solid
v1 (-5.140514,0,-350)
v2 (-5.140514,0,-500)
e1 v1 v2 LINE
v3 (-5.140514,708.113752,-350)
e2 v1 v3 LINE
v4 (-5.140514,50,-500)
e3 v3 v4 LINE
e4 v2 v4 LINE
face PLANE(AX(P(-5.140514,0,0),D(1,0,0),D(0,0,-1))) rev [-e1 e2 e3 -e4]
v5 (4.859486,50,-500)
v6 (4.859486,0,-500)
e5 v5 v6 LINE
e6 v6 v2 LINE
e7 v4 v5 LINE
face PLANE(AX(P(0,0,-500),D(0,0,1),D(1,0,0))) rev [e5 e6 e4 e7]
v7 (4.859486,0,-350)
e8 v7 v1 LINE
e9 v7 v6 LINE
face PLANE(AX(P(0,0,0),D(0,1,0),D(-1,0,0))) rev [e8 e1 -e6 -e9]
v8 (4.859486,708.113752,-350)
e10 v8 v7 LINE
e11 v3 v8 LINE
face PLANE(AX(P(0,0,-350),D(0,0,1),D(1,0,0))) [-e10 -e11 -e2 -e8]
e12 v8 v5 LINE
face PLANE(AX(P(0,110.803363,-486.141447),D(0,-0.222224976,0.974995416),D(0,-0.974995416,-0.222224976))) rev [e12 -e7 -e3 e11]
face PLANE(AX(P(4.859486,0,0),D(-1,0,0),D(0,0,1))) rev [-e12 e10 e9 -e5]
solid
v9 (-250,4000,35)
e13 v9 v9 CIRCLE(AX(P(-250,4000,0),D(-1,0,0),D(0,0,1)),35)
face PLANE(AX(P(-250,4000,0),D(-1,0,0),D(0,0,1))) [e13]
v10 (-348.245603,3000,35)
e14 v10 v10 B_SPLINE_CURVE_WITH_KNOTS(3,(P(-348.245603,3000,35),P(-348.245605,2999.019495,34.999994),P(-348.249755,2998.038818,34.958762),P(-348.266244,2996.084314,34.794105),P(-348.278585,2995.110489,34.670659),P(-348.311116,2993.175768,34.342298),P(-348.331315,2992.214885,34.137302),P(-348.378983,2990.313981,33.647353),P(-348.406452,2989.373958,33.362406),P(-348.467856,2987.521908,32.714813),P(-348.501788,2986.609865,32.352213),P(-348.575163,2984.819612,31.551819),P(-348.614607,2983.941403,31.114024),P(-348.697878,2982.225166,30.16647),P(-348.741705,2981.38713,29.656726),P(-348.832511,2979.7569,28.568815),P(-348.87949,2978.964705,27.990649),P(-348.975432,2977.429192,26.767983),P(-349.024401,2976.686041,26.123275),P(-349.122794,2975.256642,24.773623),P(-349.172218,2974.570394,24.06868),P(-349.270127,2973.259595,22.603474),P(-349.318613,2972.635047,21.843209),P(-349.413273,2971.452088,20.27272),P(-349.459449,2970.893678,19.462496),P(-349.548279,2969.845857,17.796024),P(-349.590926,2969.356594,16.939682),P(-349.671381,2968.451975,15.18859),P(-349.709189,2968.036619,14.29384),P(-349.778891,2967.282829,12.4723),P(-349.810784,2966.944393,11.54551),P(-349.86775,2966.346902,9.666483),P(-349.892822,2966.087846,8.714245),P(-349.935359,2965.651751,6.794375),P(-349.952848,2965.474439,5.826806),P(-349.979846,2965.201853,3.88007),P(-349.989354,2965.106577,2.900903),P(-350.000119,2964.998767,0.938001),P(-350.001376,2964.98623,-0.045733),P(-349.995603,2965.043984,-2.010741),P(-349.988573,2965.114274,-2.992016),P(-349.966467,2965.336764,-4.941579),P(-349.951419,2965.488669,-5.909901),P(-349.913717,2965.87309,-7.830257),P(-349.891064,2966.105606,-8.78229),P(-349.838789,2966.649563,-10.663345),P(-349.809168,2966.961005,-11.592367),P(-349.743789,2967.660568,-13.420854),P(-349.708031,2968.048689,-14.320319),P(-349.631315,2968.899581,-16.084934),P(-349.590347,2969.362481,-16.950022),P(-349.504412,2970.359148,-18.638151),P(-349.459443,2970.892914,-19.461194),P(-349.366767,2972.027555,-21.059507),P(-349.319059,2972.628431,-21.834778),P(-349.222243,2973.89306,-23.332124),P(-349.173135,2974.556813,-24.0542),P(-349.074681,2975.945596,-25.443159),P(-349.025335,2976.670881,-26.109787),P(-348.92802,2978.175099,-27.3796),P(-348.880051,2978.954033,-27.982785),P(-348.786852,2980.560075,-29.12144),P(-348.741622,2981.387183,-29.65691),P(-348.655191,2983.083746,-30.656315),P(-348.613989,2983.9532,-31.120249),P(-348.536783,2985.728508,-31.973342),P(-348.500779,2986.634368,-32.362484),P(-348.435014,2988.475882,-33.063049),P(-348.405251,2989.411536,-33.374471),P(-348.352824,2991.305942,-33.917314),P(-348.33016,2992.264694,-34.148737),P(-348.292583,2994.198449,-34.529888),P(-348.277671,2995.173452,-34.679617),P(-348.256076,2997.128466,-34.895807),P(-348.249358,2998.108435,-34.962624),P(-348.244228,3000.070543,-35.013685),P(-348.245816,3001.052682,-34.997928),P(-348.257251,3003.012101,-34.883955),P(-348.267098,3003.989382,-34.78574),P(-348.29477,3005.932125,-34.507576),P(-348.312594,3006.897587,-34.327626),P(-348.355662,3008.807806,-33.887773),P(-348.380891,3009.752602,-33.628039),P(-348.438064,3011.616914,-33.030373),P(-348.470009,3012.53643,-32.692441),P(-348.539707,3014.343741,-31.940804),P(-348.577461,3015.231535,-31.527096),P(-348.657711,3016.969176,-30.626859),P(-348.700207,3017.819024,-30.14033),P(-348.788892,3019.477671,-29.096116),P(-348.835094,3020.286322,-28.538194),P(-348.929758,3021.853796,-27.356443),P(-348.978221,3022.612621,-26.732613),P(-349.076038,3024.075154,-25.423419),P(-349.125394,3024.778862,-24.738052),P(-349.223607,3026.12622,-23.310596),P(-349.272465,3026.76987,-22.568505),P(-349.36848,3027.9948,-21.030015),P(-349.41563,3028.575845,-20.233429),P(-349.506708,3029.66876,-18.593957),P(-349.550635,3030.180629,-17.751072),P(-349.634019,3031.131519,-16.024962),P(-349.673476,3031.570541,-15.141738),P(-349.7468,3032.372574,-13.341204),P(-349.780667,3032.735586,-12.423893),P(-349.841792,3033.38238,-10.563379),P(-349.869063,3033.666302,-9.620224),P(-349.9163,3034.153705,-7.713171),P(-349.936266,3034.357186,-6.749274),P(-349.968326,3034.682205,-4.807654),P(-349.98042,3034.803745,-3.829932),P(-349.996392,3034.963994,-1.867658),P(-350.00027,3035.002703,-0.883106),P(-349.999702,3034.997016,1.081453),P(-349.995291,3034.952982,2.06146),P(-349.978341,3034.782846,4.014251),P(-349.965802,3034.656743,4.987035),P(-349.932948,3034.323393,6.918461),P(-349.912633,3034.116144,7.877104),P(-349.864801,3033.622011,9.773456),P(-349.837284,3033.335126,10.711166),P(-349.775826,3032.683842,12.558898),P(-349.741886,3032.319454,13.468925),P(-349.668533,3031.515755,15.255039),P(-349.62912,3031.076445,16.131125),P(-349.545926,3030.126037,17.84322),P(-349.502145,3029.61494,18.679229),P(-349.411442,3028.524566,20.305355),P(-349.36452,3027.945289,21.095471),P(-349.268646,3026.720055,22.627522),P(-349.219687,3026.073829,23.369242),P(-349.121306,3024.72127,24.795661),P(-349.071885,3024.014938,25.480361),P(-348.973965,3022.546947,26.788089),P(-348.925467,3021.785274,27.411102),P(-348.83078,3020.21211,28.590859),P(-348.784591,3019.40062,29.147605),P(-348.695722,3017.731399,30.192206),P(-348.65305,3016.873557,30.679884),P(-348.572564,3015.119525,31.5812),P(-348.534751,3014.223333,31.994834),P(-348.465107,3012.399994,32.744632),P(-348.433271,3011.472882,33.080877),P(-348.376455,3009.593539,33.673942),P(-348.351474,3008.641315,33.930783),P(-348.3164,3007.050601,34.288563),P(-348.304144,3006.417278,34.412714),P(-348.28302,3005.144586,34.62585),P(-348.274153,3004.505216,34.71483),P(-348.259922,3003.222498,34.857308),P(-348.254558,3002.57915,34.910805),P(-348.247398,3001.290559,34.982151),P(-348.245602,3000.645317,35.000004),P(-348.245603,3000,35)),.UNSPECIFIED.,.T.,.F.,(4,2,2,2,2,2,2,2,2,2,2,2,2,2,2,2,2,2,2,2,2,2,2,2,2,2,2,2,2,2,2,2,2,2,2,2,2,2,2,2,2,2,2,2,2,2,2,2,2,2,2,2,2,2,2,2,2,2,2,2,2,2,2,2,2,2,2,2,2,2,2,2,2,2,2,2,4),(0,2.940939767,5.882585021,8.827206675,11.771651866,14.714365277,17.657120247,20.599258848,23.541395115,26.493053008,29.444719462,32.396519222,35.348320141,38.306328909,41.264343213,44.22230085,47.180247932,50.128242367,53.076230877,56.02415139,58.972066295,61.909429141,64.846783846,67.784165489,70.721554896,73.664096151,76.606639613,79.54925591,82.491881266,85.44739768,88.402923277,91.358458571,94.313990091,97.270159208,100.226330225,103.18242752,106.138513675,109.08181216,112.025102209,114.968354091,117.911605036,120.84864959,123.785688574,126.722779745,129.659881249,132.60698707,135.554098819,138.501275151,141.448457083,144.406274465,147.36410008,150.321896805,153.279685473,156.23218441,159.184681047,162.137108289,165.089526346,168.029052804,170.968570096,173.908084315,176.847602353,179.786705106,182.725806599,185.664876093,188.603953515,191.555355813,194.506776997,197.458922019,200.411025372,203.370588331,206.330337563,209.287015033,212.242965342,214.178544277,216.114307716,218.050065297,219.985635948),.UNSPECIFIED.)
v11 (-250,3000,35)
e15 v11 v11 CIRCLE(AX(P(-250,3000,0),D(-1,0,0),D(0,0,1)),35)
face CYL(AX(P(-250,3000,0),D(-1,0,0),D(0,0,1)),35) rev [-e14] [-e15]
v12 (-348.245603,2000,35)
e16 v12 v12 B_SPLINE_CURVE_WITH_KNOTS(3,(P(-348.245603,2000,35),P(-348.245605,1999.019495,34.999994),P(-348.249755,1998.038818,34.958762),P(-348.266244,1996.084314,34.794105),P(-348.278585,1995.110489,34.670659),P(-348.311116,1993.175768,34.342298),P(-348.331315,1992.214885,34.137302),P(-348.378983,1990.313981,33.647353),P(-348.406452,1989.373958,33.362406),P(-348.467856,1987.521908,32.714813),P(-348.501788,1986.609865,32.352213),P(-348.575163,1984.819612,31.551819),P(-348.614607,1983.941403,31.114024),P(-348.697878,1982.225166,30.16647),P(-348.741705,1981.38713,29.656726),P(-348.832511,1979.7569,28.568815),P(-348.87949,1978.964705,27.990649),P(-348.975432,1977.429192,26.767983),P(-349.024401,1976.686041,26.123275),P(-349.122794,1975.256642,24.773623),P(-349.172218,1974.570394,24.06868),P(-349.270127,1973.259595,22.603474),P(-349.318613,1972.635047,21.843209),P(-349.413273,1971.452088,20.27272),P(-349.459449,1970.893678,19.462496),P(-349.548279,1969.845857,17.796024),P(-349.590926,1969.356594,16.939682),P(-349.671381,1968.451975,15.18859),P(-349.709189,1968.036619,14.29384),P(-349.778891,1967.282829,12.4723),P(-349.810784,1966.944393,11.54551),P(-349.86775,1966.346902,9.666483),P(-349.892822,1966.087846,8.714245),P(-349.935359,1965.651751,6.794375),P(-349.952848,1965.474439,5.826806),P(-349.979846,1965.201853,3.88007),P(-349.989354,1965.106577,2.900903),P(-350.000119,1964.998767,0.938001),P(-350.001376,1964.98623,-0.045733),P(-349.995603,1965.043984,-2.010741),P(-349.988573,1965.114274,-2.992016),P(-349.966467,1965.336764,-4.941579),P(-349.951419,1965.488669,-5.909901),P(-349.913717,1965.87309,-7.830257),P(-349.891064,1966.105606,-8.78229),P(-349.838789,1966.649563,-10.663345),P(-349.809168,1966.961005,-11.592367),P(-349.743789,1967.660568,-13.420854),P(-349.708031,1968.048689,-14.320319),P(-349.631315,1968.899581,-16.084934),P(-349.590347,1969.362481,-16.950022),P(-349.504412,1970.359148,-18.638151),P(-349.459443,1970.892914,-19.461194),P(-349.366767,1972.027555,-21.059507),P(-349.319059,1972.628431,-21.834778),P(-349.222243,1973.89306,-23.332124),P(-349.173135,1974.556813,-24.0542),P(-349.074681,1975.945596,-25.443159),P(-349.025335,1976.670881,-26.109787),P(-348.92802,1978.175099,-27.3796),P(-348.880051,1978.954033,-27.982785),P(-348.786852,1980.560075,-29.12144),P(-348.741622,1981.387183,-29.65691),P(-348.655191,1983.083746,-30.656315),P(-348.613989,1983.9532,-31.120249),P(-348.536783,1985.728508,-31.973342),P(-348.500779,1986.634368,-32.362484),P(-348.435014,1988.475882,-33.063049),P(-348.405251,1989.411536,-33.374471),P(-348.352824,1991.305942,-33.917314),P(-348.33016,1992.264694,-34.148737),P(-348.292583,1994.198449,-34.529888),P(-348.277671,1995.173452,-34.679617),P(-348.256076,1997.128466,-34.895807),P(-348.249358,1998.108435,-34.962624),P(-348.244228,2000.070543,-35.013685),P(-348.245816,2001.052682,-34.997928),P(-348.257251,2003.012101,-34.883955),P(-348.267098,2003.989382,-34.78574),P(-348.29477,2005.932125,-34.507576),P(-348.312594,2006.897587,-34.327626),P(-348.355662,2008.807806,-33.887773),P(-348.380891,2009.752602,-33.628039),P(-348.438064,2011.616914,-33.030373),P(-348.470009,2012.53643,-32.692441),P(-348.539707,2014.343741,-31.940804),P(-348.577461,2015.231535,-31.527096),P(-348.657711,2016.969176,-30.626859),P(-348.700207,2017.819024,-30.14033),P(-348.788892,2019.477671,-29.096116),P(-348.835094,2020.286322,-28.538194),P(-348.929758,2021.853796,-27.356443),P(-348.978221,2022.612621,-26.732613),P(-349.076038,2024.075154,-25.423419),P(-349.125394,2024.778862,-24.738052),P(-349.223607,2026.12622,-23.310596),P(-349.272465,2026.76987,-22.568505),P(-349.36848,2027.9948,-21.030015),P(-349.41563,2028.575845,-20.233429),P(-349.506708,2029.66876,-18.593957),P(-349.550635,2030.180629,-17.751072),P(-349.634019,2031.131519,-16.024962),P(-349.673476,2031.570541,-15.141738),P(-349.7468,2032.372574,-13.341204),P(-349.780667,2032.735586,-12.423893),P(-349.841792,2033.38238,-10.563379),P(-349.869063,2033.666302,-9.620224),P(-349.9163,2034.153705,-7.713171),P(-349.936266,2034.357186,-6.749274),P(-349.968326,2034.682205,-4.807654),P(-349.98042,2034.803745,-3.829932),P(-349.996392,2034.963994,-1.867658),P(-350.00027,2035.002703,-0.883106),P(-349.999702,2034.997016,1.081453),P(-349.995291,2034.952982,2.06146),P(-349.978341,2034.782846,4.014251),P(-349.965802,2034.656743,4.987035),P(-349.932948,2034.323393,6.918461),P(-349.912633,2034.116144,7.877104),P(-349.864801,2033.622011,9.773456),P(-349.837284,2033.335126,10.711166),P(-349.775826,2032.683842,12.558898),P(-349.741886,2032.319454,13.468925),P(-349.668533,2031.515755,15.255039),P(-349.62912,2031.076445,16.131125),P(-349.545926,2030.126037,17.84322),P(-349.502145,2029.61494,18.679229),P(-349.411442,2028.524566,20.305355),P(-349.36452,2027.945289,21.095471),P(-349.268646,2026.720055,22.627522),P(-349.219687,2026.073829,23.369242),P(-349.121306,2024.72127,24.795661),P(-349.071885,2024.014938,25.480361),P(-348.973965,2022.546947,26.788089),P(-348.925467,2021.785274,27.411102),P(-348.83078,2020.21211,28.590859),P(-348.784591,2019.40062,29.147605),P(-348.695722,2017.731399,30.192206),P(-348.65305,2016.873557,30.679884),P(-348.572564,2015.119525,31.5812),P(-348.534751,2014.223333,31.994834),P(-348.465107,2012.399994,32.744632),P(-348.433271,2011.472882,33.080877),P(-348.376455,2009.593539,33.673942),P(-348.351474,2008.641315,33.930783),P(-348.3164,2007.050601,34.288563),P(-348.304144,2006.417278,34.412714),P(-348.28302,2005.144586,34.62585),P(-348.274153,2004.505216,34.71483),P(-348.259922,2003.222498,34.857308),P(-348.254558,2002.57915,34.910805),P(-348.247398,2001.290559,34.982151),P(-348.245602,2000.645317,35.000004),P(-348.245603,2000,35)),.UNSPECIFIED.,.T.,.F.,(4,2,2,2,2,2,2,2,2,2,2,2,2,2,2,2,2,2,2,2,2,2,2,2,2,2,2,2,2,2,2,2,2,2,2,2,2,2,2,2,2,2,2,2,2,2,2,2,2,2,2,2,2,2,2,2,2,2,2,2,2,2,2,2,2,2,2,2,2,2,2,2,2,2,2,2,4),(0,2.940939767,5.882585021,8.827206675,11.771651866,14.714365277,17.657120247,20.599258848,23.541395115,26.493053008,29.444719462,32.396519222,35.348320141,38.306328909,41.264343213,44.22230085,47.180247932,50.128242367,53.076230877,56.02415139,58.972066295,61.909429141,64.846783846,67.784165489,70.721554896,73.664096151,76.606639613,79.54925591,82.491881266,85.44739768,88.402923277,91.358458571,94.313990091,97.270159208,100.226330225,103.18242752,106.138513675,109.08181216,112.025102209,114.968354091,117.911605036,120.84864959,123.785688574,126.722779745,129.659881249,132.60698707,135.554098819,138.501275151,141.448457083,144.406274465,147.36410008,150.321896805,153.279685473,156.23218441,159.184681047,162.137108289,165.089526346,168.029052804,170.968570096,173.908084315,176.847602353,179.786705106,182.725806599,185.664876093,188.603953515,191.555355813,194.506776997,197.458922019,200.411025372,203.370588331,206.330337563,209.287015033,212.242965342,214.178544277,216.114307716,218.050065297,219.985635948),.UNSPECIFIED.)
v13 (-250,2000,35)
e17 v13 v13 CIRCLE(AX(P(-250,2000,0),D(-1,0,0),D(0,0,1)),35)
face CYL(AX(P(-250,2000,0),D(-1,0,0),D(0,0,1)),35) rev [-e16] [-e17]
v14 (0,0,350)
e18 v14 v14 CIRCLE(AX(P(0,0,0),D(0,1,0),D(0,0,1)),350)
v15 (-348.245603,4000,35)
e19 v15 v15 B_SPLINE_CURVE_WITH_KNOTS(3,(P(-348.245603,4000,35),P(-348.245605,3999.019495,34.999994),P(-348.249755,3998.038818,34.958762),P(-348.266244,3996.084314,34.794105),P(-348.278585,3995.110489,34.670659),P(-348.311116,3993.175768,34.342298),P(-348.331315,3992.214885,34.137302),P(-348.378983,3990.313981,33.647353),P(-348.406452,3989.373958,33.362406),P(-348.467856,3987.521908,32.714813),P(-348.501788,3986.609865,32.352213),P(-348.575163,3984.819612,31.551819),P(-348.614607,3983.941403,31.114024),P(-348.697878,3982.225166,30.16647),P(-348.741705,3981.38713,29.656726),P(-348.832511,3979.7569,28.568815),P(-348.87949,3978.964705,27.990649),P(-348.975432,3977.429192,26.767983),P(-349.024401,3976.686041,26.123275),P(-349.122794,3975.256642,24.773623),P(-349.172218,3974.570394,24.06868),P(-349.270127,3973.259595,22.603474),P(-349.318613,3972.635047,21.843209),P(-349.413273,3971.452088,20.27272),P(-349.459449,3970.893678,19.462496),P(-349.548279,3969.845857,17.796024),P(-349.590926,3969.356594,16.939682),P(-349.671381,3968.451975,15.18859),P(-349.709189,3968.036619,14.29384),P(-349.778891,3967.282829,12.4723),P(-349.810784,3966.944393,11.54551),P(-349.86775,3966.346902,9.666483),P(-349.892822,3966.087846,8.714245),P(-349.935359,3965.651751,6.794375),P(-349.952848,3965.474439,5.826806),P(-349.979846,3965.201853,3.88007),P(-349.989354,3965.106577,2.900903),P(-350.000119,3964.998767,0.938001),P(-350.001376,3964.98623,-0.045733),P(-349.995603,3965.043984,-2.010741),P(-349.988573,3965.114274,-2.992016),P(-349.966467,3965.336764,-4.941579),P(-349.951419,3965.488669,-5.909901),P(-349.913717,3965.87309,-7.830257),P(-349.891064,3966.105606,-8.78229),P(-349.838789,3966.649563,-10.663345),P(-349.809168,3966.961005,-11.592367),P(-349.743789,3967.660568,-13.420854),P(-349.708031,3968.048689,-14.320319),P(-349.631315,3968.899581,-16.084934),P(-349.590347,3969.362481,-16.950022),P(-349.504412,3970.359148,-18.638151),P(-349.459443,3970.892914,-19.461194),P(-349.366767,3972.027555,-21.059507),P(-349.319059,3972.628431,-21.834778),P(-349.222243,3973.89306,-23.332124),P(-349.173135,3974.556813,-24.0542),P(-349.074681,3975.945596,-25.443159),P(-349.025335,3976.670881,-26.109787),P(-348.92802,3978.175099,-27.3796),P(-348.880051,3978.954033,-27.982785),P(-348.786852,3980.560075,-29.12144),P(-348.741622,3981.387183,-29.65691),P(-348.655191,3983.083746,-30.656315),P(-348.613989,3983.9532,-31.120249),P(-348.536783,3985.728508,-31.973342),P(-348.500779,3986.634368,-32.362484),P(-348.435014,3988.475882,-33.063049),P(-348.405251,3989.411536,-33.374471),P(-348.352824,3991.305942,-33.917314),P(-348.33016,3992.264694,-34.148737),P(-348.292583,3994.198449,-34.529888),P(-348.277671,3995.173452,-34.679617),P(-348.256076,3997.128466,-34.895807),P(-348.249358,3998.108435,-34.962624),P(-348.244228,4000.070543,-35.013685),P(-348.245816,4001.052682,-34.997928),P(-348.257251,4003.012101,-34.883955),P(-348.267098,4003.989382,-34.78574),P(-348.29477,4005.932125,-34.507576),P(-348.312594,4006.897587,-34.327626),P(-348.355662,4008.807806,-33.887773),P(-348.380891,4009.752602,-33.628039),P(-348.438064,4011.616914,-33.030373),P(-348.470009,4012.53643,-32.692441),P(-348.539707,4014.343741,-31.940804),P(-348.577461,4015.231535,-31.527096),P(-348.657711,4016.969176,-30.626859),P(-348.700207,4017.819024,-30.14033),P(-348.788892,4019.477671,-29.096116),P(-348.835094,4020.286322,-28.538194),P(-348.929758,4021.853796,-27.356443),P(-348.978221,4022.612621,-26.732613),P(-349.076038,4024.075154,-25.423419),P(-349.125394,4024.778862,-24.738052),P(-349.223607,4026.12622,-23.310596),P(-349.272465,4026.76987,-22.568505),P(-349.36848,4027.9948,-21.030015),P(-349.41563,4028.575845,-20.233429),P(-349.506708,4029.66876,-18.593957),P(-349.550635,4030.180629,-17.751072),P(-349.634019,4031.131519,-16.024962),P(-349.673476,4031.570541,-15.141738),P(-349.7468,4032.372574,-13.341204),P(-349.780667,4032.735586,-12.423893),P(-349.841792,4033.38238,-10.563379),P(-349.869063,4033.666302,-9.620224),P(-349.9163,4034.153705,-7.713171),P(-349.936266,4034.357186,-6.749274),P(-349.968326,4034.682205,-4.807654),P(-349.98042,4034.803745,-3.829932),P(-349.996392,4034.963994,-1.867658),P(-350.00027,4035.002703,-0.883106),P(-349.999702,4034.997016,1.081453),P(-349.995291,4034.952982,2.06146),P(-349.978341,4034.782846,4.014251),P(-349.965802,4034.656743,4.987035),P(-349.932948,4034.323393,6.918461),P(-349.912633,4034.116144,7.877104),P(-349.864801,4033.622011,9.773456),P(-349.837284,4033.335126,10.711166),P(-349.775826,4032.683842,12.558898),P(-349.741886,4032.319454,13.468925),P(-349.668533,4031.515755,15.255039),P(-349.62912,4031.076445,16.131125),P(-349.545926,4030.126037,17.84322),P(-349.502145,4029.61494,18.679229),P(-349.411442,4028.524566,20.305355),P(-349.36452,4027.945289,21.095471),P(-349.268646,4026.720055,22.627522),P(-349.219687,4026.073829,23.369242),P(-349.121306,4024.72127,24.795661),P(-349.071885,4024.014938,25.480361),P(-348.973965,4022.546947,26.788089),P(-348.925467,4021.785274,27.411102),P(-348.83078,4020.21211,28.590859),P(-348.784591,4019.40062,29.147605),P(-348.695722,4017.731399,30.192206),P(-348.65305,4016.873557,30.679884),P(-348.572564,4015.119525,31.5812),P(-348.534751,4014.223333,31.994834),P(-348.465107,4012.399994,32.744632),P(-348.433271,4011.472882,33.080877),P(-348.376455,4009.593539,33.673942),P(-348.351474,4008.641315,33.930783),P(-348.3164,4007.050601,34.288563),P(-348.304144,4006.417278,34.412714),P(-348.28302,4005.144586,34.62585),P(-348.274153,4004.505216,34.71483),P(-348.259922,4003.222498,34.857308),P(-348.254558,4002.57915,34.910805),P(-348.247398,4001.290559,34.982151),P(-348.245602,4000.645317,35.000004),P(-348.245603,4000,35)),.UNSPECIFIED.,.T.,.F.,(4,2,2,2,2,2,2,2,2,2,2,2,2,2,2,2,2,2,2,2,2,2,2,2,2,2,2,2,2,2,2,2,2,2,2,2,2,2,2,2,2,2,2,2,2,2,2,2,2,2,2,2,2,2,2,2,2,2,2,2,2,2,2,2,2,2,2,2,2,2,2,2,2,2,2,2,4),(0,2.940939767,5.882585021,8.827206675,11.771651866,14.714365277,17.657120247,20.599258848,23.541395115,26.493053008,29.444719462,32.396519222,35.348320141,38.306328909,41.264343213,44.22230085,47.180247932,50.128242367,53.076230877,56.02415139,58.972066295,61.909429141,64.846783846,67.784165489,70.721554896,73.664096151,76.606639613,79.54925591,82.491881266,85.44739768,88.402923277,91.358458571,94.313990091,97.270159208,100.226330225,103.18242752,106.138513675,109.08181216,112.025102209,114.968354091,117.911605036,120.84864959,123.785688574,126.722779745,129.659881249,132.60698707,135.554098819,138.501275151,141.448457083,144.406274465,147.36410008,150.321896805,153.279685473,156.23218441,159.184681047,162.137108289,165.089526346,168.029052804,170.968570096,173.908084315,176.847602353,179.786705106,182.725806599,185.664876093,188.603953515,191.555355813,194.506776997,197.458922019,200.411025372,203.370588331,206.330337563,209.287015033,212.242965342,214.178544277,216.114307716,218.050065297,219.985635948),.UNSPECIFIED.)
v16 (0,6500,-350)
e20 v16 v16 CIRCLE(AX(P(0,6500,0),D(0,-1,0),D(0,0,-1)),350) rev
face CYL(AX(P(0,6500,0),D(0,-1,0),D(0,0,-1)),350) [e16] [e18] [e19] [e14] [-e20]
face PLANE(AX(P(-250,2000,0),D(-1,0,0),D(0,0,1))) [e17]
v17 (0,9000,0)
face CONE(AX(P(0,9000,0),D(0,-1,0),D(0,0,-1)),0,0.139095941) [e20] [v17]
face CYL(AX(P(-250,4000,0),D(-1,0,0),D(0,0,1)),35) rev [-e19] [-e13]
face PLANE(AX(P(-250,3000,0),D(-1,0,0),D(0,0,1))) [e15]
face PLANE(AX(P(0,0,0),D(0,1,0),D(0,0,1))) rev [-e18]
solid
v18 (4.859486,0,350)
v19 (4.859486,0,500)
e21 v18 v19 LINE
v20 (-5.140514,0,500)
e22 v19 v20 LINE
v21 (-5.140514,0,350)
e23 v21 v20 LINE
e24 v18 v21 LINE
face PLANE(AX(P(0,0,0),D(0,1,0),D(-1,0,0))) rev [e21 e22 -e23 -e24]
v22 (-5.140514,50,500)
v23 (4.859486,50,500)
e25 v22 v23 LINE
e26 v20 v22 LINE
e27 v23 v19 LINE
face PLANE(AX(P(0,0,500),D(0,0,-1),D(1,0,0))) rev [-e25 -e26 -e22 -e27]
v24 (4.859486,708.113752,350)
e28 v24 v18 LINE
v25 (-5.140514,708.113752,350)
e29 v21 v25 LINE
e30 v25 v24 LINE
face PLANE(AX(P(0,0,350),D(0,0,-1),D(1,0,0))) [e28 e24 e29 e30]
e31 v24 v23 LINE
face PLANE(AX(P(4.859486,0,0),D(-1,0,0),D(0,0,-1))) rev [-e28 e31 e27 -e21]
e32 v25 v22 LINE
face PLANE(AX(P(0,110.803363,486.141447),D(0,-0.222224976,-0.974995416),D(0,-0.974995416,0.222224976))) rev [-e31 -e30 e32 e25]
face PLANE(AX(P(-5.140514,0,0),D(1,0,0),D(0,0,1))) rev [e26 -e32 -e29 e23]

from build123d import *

# Parameters (mm, degrees)
SKETCH1_R           = 350
BOSS_EXTRUDE1_DEPTH = 6500
SKETCH10_R          = 35
CUT_EXTRUDE2_DEPTH  = 100
LPATTERN1_COUNT     = 3
LPATTERN1_PITCH     = 1000


# Read off the part's stored shape, not the designer's step: Loft3
with BuildPart() as part:
    # Sketch1 → Boss-Extrude1 (new body)
    with BuildSketch(Plane(origin=(0, 0, 0), x_dir=(1, 0, 0), z_dir=(0, 1, 0))):
        with Locations(Location((0, 0, 0), (0, 0, 270))):
            Circle(SKETCH1_R)
    extrude(amount=BOSS_EXTRUDE1_DEPTH)

    # Sketch10 → Cut-Extrude2 (cut)
    with BuildSketch(Plane.ZY.offset(350)):
        with Locations((0, 2000)):
            Circle(SKETCH10_R)
    cut_extrude2 = extrude(amount=-CUT_EXTRUDE2_DEPTH, mode=Mode.SUBTRACT)

    # LPattern1: Cut-Extrude2 ×3
    with Locations(*[(0, i * LPATTERN1_PITCH, 0) for i in range(1, LPATTERN1_COUNT)]):
        add(cut_extrude2, mode=Mode.SUBTRACT)

    # Loft3 outline → Loft3 (revolve)
    with BuildSketch(Plane.XY):
        Polygon((350, 6500), (0, 9000), (0, 6500), align=None)
    revolve(axis=Axis((0, 0, 0), (0, 1, 0)))


with BuildPart() as body_2:
    # Sketch6 → Loft2 section 0
    with BuildSketch(Plane(origin=(0, 0, -350), x_dir=(-1, 0, 0), z_dir=(0, 0, -1))):
        with BuildLine():
            Line((-4.859485667, 0), (-4.859485667, 708.11375157))
            Line((-4.859485667, 708.11375157), (5.140514333, 708.11375157))
            Line((5.140514333, 708.11375157), (5.140514333, 0))
            Line((5.140514333, 0), (-4.859485667, 0))
        make_face()
    # Sketch7 → Loft2 section 1
    with BuildSketch(Plane(origin=(0, 0, -500), x_dir=(-1, 0, 0), z_dir=(0, 0, -1))):
        with BuildLine():
            Line((-4.859485667, 0), (-4.859485667, 50))
            Line((-4.859485667, 50), (5.140514333, 50))
            Line((5.140514333, 50), (5.140514333, 0))
            Line((5.140514333, 0), (-4.859485667, 0))
        make_face()
    loft()


with BuildPart() as body_3:
    # Mirror1: mirrored copy
    add(body_2.part.mirror(Plane.XY))


solid = Compound([part.part, body_2.part, body_3.part])
